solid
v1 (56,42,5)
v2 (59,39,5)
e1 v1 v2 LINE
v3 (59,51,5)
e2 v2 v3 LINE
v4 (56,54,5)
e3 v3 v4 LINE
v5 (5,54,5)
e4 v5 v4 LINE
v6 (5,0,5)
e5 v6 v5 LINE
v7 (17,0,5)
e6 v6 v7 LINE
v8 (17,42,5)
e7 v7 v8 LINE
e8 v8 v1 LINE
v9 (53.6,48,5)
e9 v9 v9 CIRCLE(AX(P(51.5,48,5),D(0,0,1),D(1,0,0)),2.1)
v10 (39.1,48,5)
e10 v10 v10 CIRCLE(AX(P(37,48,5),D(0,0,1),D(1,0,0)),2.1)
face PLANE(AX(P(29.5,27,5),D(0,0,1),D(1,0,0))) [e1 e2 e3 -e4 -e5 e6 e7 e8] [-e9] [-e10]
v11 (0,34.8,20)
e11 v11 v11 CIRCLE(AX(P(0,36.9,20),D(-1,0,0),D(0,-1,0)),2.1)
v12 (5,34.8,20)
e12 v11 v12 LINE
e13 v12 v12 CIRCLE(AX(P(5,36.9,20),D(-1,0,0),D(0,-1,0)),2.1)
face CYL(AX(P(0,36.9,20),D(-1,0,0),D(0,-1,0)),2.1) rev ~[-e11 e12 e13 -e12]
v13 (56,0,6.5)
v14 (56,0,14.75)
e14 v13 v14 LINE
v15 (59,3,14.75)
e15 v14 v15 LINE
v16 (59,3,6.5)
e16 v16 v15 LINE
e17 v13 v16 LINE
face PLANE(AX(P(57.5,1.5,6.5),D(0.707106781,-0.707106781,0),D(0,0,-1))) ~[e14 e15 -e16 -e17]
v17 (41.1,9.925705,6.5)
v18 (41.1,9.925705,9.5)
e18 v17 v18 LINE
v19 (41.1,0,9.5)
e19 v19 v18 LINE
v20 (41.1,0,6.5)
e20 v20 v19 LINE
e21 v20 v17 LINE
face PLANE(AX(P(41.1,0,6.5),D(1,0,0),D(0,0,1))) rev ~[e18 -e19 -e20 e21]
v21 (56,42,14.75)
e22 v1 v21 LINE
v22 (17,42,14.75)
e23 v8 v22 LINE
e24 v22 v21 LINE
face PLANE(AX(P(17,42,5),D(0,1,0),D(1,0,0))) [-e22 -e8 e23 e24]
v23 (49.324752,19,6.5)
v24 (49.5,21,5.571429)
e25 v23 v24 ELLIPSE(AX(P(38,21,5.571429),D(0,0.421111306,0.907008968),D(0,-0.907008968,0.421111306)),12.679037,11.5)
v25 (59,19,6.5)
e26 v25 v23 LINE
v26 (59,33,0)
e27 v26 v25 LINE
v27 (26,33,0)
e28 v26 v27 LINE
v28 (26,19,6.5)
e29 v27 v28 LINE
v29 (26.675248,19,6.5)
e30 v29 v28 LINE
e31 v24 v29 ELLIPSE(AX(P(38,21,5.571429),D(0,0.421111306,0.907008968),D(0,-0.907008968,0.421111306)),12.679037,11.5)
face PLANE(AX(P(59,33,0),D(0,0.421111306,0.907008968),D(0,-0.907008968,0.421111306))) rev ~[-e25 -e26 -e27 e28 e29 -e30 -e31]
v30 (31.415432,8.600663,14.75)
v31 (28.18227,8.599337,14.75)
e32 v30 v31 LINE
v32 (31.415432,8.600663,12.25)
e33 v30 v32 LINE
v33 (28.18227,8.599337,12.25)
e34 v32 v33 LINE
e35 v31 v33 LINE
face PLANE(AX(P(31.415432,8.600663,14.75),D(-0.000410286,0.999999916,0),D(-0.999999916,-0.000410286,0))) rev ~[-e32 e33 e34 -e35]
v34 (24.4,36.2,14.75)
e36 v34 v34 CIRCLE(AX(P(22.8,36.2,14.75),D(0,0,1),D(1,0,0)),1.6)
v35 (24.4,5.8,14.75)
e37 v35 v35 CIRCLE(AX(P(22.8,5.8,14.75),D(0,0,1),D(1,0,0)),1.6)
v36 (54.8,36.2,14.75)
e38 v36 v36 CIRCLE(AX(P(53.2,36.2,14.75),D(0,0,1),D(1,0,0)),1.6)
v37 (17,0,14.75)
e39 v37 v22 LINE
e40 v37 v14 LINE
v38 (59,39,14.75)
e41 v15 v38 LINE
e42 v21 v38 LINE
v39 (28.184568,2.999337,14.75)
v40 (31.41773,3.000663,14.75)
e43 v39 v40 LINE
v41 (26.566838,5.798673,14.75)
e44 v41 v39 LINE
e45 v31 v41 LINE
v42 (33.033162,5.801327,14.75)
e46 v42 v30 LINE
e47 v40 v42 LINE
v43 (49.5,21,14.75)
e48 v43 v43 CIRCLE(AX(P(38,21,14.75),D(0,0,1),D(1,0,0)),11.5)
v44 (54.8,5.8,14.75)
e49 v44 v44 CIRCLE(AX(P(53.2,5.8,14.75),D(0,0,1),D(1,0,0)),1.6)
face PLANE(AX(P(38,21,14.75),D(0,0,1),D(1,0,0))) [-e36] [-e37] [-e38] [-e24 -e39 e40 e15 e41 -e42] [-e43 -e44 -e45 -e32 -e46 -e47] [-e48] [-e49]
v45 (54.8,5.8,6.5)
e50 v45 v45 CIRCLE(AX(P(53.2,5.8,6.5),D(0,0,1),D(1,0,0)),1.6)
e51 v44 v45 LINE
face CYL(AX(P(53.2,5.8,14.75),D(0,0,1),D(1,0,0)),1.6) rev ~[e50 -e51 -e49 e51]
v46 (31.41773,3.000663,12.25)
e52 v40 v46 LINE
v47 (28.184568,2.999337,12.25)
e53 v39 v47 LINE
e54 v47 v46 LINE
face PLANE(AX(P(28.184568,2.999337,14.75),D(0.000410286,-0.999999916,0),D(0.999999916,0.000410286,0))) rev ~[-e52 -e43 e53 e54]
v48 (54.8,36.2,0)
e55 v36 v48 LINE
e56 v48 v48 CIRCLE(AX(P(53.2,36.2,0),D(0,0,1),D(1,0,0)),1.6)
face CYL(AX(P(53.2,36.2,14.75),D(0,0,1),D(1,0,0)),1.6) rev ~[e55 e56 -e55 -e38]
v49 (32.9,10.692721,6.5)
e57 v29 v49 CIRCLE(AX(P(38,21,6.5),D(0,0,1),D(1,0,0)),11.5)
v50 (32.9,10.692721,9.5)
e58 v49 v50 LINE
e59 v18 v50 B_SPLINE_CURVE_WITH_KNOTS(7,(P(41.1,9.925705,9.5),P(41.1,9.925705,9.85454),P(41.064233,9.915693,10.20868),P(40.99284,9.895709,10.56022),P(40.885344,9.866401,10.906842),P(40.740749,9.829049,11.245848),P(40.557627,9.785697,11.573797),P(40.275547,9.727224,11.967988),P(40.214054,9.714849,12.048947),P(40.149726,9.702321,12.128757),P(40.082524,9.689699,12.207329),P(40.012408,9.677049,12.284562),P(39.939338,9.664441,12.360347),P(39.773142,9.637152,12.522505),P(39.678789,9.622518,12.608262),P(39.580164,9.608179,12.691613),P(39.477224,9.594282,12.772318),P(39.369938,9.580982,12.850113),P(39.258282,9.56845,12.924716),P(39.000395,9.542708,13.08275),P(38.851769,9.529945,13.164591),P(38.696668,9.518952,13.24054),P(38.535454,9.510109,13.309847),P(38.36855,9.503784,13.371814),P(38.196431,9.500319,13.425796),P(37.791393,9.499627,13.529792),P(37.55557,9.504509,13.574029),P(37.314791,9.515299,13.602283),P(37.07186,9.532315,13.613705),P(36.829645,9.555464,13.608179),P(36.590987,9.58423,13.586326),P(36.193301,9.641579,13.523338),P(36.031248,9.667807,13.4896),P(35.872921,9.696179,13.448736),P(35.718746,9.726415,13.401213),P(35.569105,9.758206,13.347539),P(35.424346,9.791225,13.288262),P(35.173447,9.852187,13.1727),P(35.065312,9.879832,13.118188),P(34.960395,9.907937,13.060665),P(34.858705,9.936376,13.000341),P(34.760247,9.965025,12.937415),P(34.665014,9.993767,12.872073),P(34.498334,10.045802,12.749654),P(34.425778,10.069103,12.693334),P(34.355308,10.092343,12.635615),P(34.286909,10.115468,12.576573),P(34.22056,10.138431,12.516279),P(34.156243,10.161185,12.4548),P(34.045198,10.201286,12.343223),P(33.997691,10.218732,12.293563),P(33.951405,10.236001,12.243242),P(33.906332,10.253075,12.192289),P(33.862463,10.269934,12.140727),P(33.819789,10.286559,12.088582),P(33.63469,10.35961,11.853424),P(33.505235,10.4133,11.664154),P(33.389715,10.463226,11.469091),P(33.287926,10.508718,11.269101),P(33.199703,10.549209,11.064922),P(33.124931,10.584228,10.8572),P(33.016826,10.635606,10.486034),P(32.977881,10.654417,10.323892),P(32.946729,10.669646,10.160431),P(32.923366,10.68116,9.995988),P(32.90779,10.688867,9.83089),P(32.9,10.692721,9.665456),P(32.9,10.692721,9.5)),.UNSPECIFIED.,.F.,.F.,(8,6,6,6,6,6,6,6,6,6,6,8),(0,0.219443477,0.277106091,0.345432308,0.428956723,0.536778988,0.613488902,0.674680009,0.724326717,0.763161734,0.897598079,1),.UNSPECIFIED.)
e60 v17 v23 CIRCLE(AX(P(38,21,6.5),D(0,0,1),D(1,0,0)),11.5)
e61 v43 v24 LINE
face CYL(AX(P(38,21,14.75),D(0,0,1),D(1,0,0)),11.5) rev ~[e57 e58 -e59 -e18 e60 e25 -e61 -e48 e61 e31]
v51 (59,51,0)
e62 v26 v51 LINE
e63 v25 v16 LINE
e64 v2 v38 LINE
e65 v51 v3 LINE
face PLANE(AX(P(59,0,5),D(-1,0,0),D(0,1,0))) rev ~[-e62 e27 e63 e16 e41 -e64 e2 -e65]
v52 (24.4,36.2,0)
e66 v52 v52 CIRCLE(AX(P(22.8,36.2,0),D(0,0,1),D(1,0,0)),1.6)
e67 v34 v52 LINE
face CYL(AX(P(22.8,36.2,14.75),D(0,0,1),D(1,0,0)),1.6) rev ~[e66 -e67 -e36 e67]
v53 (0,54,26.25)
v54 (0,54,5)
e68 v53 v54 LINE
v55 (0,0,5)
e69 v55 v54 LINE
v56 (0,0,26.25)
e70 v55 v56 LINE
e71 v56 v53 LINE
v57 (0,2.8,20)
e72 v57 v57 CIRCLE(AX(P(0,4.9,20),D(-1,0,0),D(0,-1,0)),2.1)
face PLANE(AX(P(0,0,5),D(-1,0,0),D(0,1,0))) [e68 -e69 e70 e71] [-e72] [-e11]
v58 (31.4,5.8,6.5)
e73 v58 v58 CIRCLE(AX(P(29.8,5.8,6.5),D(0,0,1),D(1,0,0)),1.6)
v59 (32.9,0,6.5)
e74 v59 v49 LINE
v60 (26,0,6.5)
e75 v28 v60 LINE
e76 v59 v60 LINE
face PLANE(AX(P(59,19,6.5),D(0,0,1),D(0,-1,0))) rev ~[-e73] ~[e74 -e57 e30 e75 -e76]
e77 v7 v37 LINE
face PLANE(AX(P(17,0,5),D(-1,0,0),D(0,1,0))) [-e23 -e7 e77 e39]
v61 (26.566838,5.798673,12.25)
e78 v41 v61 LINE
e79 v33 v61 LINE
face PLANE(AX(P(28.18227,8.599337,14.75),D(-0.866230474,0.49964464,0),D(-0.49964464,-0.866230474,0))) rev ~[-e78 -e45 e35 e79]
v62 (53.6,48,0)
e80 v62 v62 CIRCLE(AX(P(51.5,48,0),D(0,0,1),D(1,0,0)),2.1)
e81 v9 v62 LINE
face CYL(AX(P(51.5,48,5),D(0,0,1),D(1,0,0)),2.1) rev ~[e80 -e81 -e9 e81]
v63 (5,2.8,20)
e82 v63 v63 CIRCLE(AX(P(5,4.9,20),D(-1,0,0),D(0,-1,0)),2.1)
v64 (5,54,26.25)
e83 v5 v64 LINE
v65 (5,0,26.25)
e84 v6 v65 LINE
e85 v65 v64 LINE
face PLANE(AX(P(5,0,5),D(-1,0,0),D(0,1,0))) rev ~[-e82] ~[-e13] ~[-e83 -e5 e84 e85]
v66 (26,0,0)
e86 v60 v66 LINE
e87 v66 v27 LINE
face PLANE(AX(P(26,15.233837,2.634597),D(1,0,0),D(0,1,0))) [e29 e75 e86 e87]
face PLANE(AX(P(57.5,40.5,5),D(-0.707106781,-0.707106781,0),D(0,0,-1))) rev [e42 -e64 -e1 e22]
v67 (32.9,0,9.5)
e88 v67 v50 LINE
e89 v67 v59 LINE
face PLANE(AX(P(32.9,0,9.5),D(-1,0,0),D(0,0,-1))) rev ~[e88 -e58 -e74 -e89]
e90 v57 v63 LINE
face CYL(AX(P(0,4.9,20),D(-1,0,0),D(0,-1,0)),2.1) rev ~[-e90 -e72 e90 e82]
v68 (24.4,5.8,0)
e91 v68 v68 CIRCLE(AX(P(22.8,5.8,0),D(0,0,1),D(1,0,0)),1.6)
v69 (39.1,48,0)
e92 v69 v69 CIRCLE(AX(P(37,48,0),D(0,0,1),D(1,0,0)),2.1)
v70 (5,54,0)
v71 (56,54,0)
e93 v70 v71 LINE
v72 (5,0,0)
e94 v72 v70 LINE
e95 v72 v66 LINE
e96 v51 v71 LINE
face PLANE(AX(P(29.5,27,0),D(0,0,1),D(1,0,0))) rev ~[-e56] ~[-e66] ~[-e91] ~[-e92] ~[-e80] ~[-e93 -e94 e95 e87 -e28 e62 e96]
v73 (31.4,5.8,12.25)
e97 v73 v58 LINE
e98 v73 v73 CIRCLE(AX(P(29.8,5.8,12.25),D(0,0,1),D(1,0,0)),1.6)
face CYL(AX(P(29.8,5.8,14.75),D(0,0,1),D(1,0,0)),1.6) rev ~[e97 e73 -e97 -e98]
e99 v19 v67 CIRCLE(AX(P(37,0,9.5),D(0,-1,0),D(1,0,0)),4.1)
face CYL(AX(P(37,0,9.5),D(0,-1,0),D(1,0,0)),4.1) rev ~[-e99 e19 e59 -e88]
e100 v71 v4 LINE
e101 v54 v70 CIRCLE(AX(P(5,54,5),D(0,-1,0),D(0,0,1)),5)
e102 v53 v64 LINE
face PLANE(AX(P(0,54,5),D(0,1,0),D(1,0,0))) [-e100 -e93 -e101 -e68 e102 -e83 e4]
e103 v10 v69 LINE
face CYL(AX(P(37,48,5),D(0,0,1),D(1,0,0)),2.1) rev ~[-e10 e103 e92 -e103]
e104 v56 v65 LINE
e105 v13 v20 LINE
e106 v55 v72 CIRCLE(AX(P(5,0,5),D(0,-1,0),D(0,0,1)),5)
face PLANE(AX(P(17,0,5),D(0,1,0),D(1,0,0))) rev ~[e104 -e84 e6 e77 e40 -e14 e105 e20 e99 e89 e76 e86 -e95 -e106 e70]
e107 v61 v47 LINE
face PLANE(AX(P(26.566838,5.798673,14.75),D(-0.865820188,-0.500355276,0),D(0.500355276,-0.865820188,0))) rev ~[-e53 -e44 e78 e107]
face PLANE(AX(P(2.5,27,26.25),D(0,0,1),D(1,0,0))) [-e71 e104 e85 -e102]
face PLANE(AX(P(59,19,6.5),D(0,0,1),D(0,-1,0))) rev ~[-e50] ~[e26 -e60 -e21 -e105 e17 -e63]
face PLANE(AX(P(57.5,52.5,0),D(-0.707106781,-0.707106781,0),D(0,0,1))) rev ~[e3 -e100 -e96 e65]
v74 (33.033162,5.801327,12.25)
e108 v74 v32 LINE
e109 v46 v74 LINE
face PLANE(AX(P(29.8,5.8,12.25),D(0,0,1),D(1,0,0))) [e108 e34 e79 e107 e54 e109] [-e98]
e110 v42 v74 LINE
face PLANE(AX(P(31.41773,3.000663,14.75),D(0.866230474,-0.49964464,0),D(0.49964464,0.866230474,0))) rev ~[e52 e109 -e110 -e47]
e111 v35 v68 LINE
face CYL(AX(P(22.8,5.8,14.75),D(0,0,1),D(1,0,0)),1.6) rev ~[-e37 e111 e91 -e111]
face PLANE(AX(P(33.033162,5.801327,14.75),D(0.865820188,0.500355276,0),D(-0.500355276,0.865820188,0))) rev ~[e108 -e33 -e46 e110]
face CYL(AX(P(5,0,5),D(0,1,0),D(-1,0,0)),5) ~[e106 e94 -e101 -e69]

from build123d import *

# Parameters (mm, degrees)
F0_W      = 59
F0_H      = 54
F1_DEPTH  = 5
F2_W      = 5
F2_H      = 54
F3_DEPTH  = 21.25
F4_W      = 42
F4_H      = 42
F5_DEPTH  = 9.75
F7_DEPTH  = 33
F8_R      = 1.6
F8_R_2    = 11.5
F9_DEPTH  = 14.751
F10_R     = 2.1
F11_DEPTH = 5.001
F12_SIZE  = 3
F13_R     = 5
F14_R     = 1.6
F15_DEPTH = 2.5
F16_R     = 2.1
F17_DEPTH = 59.001
F19_DEPTH = 10.6937211186


with BuildPart() as f1:
    # F0 (on Top) → F1 (new body)
    with BuildSketch(Plane.XY):
        with Locations((29.5, 27)):
            Rectangle(F0_W, F0_H)
    extrude(amount=F1_DEPTH)

    # F2 (on face) → F3 (join)
    with BuildSketch(Plane.XY.offset(5)):
        with Locations((2.5, 27)):
            Rectangle(F2_W, F2_H)
    extrude(amount=F3_DEPTH)

    # F4 (on face) → F5 (join)
    with BuildSketch(Plane.XY.offset(5)):
        with Locations((38, 21)):
            Rectangle(F4_W, F4_H)
    extrude(amount=F5_DEPTH)

    # F6 (on face) → F7 (cut)
    with BuildSketch(Plane.YZ.offset(59)):
        Polygon((0, 6.5), (0, 0), (33, 0), (19, 6.5), align=None)
    extrude(amount=-F7_DEPTH, mode=Mode.SUBTRACT)

    # F8 (on face) → F9 (cut, through all)
    with BuildSketch(Plane.XY.offset(14.75)):
        with Locations((22.8, 36.2)):
            Circle(F8_R)
        with Locations((38, 21)):
            Circle(F8_R_2)
        with Locations((53.2, 36.2)):
            Circle(F8_R)
        with Locations((22.8, 5.8)):
            Circle(F8_R)
        with Locations((53.2, 5.8)):
            Circle(F8_R)
        with Locations((29.8, 5.8)):
            Circle(F8_R)
    extrude(amount=-F9_DEPTH, mode=Mode.SUBTRACT)

    # F10 (on face) → F11 (cut, through all)
    with BuildSketch(Plane.XY.offset(5)):
        with Locations((37, 48)):
            Circle(F10_R)
        with Locations((51.5, 48)):
            Circle(F10_R)
    extrude(amount=-F11_DEPTH, mode=Mode.SUBTRACT)

    # F12
    f12_edges = [f1.edges().sort_by_distance(p)[0] for p in [
        (59, 54, 2.5),
        (59, 42, 9.875),
        (59, 0, 10.625),
    ]]
    chamfer(f12_edges, length=F12_SIZE)

    # F13
    f13_edges = [f1.edges().sort_by_distance(p)[0] for p in [
        (0, 27, 0),
    ]]
    fillet(f13_edges, radius=F13_R)

    # F14 (on face) → F15 (cut)
    with BuildSketch(Plane.XY.offset(14.75)):
        Polygon((31.417729554, 3.0006632601), (33.0331615075, 5.8013265202), (31.4154319535, 8.6006632601), (28.182270446, 8.5993367399), (26.5668384925, 5.7986734798), (28.1845680465, 2.9993367399), align=None)
        with Locations((29.8, 5.8)):
            Circle(F14_R, mode=Mode.SUBTRACT)
    extrude(amount=-F15_DEPTH, mode=Mode.SUBTRACT)

    # F16 (on face) → F17 (cut, through all)
    with BuildSketch(Plane(origin=(0, 0, 0), x_dir=(0, -1, 0), z_dir=(-1, 0, 0))):
        with Locations((-36.9, 20)):
            Circle(F16_R)
        with Locations((-4.9, 20)):
            Circle(F16_R)
    extrude(amount=-F17_DEPTH, mode=Mode.SUBTRACT)

    # F18 (on face) → F19 (cut, through all)
    with BuildSketch(Plane.XZ):
        with BuildLine():
            Line((32.9, 9.5), (32.9, 6.5))
            Line((32.9, 6.5), (41.1, 6.5))
            Line((41.1, 6.5), (41.1, 9.5))
            ThreePointArc((41.1, 9.5), (37, 13.6), (32.9, 9.5))
        make_face()
    extrude(amount=-F19_DEPTH, mode=Mode.SUBTRACT)


solid = f1.part
